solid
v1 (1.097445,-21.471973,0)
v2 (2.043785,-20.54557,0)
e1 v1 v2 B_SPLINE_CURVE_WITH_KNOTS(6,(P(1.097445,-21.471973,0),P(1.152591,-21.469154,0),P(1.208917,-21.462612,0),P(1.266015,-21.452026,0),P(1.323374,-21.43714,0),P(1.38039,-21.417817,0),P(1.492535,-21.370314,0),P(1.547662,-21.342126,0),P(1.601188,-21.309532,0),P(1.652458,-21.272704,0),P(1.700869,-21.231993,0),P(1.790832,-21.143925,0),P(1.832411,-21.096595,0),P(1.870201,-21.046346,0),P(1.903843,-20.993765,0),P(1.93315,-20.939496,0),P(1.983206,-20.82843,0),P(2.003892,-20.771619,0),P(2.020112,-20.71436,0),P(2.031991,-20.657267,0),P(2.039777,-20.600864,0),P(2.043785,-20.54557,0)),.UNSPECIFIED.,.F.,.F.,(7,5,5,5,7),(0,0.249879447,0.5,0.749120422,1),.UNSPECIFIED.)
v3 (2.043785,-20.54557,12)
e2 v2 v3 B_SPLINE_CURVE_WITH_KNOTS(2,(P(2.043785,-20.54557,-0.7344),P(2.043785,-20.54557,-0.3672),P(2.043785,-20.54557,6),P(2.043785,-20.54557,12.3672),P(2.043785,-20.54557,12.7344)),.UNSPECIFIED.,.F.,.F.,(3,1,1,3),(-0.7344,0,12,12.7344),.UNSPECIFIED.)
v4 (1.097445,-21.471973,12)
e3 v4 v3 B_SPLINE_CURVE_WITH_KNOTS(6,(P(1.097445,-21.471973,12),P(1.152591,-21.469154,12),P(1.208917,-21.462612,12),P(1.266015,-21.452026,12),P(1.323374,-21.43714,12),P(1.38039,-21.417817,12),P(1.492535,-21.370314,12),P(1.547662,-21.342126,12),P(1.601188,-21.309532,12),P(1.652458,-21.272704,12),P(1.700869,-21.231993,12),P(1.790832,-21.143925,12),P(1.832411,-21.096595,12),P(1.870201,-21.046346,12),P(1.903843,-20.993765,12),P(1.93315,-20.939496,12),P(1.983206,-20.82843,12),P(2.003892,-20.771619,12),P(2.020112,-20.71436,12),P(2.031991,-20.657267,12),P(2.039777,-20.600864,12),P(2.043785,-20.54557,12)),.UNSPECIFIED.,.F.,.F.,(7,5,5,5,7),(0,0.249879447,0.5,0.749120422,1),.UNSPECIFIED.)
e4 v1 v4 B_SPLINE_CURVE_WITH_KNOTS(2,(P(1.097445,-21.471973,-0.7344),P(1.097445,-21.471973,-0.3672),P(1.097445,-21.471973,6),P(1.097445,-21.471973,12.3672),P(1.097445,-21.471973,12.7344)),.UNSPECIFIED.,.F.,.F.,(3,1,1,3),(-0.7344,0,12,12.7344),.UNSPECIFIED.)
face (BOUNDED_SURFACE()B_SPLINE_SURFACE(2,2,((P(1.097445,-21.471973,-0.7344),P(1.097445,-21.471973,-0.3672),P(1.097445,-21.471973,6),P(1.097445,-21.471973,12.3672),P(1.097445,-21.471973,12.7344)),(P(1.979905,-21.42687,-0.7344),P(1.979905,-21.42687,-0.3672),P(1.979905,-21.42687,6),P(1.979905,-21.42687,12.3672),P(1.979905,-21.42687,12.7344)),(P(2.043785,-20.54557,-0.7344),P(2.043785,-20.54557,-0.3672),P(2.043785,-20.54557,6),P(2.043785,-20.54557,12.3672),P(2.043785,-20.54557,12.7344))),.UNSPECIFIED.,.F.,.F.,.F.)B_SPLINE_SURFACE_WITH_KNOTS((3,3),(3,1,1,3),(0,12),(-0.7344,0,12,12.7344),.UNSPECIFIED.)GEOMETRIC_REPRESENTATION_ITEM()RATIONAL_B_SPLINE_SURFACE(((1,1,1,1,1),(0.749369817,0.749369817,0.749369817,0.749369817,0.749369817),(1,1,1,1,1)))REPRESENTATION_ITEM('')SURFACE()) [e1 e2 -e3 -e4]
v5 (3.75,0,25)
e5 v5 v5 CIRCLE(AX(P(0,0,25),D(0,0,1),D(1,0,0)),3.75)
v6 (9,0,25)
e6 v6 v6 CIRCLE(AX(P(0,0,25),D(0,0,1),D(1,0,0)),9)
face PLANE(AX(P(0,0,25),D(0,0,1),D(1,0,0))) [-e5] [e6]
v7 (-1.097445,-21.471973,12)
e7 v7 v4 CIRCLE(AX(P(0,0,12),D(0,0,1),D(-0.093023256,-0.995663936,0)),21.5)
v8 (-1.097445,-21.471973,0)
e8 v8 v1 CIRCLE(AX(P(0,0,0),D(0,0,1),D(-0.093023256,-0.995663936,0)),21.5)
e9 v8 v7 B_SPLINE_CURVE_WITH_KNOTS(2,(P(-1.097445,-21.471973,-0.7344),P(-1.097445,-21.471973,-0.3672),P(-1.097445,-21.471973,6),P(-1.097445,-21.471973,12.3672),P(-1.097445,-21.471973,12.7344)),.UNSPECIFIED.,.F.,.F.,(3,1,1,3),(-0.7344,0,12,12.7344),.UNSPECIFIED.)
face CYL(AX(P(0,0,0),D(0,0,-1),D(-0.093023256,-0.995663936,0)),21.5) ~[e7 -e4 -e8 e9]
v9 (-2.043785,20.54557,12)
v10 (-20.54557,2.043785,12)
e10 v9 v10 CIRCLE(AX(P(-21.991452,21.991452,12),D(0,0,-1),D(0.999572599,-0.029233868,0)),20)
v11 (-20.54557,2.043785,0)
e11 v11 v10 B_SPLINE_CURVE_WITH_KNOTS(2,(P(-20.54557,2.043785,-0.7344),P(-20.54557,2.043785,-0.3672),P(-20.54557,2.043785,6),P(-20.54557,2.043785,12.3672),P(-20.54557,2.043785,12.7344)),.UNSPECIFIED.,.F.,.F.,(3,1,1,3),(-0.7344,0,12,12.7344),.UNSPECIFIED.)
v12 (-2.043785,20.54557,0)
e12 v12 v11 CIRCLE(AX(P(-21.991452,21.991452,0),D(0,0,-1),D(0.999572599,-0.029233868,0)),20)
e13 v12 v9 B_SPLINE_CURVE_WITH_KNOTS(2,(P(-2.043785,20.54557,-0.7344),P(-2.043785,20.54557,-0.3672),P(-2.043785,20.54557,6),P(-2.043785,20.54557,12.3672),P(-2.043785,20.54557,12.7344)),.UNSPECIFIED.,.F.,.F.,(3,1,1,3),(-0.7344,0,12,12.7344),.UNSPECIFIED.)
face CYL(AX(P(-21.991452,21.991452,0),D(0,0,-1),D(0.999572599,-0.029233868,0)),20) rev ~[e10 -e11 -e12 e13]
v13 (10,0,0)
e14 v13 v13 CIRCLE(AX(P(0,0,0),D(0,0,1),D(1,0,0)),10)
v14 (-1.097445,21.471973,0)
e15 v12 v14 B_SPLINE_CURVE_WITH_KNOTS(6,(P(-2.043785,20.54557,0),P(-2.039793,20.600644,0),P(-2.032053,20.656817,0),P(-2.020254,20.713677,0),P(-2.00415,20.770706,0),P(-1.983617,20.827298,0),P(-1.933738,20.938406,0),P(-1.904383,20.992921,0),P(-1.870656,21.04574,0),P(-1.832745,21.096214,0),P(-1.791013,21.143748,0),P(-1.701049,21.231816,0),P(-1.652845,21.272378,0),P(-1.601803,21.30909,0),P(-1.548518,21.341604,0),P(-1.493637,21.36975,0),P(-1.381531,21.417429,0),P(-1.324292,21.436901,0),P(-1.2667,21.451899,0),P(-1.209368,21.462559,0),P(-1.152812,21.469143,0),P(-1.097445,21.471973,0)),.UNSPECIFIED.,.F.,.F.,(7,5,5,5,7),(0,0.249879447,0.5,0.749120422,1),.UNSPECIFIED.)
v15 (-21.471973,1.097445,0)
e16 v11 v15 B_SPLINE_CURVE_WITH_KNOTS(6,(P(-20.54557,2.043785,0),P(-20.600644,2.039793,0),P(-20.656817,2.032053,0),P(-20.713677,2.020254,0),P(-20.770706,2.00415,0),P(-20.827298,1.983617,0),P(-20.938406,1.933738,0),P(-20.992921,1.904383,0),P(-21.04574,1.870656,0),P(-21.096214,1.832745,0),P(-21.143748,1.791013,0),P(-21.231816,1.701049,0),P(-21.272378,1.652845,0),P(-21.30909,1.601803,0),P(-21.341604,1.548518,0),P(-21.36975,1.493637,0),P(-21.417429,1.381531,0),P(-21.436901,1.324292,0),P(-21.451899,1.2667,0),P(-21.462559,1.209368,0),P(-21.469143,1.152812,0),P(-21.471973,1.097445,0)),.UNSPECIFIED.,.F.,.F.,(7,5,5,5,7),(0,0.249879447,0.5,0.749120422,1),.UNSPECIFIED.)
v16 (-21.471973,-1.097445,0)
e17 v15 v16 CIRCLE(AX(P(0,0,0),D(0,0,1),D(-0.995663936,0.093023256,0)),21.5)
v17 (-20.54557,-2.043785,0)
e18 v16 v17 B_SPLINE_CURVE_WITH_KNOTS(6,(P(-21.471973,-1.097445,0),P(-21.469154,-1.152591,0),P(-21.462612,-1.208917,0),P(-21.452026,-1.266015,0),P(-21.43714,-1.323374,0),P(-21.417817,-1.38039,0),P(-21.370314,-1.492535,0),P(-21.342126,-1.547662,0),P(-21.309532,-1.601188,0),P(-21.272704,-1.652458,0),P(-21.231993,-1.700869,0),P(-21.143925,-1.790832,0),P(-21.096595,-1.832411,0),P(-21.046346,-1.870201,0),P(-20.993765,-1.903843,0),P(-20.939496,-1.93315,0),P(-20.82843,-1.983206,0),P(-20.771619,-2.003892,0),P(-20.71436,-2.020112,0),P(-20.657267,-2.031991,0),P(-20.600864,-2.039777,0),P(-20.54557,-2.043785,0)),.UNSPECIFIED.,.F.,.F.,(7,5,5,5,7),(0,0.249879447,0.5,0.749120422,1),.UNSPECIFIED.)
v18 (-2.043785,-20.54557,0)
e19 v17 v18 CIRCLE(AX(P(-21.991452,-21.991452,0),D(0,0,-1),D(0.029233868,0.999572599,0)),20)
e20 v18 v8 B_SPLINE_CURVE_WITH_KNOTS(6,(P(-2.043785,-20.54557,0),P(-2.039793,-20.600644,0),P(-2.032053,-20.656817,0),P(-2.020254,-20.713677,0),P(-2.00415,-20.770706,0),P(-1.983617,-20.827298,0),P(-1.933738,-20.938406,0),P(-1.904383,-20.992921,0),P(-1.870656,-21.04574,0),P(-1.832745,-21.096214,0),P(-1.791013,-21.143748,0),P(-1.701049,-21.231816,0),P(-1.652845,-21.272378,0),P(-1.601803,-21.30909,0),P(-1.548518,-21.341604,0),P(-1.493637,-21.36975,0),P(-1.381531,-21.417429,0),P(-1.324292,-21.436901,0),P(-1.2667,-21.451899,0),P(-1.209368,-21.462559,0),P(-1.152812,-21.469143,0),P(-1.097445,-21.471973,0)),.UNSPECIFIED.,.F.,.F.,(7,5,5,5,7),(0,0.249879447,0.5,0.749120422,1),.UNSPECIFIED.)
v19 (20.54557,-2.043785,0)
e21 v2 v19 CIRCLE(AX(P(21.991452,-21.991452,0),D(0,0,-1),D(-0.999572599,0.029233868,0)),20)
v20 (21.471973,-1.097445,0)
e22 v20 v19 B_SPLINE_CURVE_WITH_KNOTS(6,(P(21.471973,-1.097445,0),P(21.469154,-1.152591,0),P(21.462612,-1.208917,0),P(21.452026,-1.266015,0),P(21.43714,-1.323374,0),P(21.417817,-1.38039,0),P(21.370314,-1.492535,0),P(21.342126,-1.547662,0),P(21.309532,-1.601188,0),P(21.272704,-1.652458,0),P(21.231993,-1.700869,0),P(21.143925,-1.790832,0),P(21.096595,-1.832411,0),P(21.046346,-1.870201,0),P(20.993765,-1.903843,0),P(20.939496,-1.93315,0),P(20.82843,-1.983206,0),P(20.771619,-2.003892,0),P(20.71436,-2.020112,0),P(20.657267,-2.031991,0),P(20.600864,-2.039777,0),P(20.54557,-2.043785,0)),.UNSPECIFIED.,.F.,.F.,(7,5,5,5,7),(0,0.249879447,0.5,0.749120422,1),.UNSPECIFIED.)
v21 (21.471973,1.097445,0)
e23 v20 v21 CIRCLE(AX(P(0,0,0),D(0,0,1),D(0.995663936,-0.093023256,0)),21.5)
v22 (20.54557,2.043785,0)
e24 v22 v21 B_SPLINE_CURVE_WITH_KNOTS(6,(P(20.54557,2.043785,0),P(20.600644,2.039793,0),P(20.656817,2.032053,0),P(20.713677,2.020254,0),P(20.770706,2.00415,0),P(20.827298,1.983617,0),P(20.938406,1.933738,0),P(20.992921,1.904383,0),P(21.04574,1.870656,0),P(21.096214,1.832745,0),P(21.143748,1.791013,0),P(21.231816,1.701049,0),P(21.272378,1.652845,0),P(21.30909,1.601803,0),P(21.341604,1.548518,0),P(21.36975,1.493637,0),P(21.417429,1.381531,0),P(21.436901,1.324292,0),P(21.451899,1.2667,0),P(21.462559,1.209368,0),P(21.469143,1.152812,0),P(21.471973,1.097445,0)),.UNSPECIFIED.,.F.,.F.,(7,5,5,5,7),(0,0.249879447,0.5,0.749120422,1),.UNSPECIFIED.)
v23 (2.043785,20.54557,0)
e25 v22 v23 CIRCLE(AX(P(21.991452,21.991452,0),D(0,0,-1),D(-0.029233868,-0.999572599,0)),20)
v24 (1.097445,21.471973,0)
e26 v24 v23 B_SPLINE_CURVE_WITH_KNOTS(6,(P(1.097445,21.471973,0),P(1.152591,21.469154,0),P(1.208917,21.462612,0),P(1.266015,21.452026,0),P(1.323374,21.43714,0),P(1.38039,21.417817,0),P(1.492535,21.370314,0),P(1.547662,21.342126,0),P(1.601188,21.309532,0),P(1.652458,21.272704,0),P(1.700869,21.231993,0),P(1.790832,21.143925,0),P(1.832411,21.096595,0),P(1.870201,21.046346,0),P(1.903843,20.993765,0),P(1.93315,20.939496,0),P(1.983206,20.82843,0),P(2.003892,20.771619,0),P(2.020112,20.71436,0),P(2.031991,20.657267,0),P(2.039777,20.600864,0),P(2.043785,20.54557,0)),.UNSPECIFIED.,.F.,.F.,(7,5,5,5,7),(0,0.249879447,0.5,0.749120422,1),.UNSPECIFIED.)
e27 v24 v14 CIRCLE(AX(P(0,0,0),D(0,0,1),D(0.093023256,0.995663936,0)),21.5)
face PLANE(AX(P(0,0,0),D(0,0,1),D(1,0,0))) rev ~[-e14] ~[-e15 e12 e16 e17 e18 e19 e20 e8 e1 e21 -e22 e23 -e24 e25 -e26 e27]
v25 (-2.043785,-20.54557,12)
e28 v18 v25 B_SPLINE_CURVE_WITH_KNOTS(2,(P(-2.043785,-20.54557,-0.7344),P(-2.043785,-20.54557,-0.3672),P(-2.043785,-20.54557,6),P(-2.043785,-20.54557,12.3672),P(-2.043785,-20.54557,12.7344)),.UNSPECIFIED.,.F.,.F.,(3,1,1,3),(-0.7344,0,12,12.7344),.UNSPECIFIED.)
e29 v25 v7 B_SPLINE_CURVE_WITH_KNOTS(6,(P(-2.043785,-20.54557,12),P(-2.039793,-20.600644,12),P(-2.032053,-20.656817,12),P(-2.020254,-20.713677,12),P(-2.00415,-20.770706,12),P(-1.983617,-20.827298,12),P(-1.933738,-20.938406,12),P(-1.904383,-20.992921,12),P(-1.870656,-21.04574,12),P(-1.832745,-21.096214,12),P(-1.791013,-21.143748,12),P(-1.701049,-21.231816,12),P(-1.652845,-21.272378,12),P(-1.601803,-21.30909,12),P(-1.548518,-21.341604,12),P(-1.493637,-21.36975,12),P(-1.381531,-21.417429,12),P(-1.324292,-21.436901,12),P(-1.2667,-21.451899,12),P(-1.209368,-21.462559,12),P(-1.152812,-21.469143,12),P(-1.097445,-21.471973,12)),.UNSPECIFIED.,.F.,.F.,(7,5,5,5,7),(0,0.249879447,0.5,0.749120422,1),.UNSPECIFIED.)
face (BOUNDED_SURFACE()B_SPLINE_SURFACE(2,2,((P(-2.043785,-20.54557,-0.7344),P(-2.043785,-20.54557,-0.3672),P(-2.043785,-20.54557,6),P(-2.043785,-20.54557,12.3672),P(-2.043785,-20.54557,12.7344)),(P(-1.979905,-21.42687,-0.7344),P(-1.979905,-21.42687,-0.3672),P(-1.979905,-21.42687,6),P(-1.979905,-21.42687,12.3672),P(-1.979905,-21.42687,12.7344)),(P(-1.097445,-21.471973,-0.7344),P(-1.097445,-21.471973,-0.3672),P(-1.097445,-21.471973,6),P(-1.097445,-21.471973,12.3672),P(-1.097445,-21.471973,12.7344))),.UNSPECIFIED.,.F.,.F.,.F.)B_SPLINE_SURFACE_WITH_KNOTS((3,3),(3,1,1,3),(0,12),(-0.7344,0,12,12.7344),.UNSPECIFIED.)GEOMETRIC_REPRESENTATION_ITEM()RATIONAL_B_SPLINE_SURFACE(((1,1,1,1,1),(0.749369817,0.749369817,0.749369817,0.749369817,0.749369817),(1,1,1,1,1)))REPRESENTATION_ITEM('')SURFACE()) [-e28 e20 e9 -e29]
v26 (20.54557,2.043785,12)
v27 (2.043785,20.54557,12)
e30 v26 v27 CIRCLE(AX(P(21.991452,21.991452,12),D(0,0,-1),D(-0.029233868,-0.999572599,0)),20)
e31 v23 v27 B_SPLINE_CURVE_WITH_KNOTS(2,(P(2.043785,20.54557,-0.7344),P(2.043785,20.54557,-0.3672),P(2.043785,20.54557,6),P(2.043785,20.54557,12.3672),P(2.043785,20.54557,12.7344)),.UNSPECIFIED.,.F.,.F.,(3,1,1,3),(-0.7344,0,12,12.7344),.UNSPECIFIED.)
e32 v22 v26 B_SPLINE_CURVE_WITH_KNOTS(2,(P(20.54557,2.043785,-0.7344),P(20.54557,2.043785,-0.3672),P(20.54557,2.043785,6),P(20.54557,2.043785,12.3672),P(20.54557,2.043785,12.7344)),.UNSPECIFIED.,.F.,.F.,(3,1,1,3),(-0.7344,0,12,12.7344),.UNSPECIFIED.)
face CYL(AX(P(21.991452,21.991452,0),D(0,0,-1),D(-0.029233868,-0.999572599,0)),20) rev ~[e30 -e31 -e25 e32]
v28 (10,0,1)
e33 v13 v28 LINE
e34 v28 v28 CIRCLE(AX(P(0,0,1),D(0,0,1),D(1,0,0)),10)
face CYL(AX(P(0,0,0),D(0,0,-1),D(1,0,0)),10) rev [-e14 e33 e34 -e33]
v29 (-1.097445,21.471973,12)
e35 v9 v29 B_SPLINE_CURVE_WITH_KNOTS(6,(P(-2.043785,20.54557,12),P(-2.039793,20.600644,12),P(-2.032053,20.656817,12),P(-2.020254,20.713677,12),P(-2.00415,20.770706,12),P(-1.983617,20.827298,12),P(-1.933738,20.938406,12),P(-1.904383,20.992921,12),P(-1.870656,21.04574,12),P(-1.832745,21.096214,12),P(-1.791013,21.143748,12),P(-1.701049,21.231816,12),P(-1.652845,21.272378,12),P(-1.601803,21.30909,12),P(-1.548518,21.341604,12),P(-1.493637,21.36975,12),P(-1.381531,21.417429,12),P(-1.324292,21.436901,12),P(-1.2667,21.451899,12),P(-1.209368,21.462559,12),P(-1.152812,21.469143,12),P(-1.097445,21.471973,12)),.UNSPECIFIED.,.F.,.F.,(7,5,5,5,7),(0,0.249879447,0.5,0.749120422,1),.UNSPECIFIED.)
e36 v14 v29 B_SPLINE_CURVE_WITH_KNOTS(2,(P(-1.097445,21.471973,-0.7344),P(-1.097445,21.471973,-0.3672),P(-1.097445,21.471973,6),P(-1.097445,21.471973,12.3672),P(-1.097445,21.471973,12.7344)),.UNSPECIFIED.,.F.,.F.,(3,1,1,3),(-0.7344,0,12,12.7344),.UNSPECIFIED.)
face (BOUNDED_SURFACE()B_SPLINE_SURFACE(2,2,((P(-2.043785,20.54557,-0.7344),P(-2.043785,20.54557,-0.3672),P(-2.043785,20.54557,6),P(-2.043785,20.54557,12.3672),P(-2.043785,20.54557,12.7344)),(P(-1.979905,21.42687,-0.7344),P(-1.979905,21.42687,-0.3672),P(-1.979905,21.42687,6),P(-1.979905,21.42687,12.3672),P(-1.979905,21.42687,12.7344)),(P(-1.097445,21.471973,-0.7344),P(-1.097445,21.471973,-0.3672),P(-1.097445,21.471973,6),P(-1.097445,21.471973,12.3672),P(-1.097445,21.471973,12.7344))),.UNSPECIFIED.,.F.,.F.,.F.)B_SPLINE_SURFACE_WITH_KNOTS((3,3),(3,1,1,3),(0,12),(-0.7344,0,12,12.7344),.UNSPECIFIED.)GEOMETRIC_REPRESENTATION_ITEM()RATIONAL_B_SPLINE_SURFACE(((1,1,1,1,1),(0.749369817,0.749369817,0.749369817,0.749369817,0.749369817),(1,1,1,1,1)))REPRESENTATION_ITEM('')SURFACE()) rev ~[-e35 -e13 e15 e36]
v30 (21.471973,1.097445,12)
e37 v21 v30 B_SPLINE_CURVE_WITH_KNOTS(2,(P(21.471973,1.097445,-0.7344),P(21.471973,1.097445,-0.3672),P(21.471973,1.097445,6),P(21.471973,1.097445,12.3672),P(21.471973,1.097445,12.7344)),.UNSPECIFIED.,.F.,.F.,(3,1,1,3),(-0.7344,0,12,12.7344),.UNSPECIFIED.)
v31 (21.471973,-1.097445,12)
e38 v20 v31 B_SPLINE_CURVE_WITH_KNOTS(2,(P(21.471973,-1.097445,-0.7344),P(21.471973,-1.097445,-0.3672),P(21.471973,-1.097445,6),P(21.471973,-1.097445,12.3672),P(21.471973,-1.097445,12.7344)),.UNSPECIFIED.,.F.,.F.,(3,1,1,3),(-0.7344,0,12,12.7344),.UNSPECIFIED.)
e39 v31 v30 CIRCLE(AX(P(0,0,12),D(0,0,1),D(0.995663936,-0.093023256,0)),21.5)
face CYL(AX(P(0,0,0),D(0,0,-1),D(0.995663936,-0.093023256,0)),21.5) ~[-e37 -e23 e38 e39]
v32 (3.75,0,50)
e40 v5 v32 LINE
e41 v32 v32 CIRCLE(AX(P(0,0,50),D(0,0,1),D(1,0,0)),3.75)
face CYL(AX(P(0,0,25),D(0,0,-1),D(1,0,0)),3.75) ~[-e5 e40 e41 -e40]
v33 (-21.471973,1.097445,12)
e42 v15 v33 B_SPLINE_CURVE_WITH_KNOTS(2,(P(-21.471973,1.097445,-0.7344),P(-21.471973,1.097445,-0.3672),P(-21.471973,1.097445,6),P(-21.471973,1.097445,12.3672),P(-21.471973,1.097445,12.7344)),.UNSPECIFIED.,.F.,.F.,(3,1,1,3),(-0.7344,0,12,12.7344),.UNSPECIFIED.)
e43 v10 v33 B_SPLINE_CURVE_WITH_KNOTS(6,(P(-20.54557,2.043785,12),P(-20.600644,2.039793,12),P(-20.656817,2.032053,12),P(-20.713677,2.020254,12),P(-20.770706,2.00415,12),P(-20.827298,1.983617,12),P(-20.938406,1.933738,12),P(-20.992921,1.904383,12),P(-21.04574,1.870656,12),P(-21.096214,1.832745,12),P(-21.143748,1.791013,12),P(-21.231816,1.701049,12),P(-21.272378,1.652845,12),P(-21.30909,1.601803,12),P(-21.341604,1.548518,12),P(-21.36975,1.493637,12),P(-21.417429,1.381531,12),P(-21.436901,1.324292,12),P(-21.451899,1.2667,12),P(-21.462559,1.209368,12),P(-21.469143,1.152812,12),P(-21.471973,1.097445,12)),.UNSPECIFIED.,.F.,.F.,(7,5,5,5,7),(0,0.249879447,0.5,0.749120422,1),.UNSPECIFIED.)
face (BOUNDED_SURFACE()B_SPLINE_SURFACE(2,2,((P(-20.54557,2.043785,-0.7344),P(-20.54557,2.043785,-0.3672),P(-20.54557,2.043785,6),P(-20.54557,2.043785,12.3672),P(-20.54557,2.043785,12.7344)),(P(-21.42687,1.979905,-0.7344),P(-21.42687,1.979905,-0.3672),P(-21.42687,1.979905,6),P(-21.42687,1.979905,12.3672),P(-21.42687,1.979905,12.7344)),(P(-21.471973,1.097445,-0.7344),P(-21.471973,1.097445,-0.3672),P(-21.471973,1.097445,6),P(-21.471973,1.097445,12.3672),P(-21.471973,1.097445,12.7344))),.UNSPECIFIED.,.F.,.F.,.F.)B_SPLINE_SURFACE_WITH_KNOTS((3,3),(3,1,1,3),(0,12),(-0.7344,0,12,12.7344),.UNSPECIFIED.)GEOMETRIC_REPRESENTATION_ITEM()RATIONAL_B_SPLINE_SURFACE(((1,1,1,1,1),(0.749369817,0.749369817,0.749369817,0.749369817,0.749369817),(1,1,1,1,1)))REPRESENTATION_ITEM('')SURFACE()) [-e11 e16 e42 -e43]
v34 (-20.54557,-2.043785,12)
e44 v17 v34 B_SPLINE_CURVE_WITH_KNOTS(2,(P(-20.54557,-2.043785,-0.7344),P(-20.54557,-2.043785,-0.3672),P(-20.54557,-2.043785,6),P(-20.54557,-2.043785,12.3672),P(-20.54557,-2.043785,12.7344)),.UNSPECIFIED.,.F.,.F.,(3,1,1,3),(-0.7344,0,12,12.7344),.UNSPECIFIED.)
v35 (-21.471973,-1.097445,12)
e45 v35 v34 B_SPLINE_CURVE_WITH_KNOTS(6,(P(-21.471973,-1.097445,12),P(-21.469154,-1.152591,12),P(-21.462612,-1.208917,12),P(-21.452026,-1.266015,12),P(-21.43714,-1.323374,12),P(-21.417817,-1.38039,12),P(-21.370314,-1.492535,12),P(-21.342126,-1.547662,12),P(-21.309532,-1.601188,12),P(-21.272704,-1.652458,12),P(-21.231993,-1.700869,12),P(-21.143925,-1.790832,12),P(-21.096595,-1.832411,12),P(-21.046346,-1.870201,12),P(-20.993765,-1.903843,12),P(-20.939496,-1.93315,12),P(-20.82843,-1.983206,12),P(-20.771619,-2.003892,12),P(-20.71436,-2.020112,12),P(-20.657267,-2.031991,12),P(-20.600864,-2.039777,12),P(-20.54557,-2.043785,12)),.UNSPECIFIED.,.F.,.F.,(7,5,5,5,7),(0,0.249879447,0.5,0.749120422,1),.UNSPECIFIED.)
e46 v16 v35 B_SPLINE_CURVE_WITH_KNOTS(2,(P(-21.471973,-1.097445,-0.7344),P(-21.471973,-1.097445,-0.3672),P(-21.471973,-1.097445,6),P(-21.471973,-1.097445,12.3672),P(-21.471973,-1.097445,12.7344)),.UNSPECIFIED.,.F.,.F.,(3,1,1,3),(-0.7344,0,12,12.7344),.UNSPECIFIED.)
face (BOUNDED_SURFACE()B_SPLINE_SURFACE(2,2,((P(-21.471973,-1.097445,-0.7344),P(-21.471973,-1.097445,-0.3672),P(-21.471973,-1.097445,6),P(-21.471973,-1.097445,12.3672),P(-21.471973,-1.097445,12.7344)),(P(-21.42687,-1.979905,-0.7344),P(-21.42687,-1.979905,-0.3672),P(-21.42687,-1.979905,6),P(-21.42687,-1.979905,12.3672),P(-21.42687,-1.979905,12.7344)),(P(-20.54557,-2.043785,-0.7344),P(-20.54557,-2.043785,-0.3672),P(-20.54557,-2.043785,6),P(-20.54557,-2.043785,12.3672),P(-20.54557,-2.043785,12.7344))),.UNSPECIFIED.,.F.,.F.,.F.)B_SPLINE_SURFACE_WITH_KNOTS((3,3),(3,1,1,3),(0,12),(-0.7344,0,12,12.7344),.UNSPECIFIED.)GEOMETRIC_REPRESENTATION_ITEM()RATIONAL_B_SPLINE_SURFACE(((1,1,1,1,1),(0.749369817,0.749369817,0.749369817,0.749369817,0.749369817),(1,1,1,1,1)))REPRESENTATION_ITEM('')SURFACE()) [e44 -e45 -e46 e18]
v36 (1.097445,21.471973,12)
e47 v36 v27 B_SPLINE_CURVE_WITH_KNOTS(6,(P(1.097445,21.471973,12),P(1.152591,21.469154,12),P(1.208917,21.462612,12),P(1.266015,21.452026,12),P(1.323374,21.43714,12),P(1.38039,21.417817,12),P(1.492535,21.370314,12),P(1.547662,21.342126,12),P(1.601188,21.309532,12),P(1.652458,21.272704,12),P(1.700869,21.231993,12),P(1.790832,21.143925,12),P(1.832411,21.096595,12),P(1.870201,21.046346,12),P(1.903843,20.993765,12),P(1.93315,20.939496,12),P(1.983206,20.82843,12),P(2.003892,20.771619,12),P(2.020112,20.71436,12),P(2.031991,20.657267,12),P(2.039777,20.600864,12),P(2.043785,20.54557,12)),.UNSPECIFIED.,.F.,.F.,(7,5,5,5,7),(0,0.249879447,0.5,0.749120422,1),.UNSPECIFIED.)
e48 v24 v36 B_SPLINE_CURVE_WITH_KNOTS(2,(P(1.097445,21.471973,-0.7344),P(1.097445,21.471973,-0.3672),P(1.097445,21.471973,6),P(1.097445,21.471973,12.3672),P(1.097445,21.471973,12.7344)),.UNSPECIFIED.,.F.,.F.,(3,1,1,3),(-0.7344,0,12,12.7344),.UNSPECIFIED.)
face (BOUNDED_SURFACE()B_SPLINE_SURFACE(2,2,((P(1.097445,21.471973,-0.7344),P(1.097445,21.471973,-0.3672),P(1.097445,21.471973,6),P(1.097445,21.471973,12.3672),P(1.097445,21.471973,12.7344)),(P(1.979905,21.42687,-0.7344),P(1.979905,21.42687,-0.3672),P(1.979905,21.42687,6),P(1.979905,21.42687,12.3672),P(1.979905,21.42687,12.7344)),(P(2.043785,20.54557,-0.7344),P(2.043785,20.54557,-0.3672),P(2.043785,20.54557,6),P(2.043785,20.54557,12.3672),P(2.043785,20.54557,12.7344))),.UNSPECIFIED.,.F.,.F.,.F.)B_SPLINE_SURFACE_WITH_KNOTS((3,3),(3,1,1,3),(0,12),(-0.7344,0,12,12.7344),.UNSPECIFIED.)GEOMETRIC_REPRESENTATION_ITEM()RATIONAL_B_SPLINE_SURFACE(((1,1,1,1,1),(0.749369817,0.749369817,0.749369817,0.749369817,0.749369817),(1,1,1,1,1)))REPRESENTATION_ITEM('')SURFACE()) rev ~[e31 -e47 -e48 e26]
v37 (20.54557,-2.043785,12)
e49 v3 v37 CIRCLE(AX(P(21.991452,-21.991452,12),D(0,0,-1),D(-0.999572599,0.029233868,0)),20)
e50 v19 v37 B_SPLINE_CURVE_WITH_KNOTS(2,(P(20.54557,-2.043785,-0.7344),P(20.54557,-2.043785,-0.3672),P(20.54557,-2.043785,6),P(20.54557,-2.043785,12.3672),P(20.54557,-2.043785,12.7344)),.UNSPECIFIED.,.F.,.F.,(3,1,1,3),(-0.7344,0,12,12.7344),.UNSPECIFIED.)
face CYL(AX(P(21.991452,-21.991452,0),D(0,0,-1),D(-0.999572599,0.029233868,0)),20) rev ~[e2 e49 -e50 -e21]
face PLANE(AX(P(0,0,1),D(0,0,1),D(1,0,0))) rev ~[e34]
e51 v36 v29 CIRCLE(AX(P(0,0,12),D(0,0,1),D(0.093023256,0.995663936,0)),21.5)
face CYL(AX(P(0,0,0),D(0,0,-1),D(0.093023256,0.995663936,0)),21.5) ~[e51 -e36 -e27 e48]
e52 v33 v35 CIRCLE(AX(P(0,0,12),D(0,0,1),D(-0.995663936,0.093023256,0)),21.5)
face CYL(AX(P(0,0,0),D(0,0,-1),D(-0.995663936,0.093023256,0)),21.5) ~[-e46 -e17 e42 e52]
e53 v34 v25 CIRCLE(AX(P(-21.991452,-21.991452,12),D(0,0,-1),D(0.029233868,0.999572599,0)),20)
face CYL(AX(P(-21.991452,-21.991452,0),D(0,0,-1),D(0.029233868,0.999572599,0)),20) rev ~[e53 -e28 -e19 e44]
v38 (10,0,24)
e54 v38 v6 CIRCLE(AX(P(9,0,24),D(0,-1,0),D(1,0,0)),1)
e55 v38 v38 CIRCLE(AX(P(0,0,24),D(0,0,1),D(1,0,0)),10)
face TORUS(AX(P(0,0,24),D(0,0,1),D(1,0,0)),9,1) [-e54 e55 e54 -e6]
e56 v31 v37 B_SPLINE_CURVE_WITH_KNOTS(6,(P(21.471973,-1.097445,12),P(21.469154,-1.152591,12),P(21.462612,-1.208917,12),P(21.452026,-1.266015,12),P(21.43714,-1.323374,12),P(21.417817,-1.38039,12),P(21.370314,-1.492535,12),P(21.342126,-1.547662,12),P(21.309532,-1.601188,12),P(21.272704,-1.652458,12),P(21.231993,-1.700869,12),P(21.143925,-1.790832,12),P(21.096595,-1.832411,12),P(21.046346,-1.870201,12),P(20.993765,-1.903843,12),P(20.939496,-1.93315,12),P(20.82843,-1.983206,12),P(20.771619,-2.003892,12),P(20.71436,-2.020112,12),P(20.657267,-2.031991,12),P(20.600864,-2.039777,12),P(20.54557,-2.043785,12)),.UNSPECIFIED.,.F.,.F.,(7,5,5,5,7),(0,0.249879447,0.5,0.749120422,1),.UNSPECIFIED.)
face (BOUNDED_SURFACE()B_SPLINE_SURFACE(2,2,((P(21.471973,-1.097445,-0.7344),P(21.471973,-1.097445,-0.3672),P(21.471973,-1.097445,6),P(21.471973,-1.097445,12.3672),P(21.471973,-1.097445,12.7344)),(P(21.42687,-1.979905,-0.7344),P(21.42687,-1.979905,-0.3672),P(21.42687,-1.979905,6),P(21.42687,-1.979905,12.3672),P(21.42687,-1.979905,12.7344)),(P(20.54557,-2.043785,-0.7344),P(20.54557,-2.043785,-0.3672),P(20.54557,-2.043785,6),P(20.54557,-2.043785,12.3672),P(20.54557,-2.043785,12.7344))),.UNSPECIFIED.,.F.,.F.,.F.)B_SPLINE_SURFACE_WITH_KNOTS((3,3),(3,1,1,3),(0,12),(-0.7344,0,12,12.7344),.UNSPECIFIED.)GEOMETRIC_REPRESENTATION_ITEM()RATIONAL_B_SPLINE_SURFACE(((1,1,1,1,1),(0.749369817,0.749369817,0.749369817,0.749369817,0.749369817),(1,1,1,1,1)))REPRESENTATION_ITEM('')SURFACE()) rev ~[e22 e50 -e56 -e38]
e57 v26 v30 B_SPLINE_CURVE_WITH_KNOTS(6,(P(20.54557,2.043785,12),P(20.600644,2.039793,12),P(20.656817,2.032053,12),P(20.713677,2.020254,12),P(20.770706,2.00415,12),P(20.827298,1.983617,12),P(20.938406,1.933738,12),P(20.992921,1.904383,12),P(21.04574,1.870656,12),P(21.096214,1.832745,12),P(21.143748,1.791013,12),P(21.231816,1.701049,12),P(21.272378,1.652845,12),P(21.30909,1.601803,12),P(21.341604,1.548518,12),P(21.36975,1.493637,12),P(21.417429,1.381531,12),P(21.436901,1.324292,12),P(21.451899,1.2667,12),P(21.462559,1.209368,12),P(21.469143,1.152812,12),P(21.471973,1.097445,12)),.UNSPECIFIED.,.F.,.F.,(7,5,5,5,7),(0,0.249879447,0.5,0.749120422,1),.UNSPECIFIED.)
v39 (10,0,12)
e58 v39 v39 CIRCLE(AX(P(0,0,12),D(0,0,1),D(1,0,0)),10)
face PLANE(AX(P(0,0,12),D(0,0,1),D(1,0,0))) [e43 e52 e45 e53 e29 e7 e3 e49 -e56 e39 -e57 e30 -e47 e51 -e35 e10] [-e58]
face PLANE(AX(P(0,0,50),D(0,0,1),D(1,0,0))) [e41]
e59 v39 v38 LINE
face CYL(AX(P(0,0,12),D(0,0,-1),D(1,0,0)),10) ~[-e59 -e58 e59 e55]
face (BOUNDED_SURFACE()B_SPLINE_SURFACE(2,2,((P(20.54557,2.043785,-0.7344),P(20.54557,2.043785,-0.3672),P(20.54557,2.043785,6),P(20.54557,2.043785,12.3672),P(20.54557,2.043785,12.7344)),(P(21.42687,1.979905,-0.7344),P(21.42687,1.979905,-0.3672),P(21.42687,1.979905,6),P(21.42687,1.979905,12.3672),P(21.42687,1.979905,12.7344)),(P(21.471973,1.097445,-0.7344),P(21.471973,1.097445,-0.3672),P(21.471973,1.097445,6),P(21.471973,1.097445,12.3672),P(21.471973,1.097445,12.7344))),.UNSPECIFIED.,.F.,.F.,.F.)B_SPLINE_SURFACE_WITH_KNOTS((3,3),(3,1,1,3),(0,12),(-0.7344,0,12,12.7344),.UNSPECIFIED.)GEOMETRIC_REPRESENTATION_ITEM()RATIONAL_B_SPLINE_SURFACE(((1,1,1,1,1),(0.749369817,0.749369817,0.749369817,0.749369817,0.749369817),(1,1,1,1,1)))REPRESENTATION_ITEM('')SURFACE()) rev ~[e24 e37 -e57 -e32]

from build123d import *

# Parameters (mm, degrees)
F0_R     = 10
F1_DEPTH = 12
F2_R     = 10
F3_DEPTH = 13
F4_R     = 3.75
F5_DEPTH = 25
F6_R     = 1
F7_R     = 1
F8_DEPTH = 1


with BuildPart() as f1:
    # F0 (on Top) → F1 (new body)
    with BuildSketch(Plane.XY):
        with BuildLine():
            ThreePointArc((-2, 21.4067746286), (-7.8493163593, 7.8493163593), (-21.4067746286, 2))
            ThreePointArc((-21.4067746286, 2), (-21.5, 0), (-21.4067746286, -2))
            ThreePointArc((-21.4067746286, -2), (-7.8493163593, -7.8493163593), (-2, -21.4067746286))
            ThreePointArc((-2, -21.4067746286), (0, -21.5), (2, -21.4067746286))
            ThreePointArc((2, -21.4067746286), (7.8493163593, -7.8493163593), (21.4067746286, -2))
            ThreePointArc((21.4067746286, -2), (21.5, 0), (21.4067746286, 2))
            ThreePointArc((21.4067746286, 2), (7.8493163593, 7.8493163593), (2, 21.4067746286))
            ThreePointArc((2, 21.4067746286), (0, 21.5), (-2, 21.4067746286))
        make_face()
        Circle(F0_R, mode=Mode.SUBTRACT)
        Circle(F0_R)
    extrude(amount=F1_DEPTH)

    # F2 (on face) → F3 (join)
    with BuildSketch(Plane.XY.offset(12)):
        Circle(F2_R)
    extrude(amount=F3_DEPTH)

    # F4 (on face) → F5 (join)
    with BuildSketch(Plane.XY.offset(25)):
        Circle(F4_R)
    extrude(amount=F5_DEPTH)

    # F6
    f6_edges = [f1.edges().sort_by_distance(p)[0] for p in [
        (-10, 0, 25),
    ]]
    fillet(f6_edges, radius=F6_R)

    # F7
    f7_edges = [f1.edges().sort_by_distance(p)[0] for p in [
        (-2, -21.406775, 6),
        (2, -21.406775, 6),
        (-21.406775, -2, 6),
        (-21.406775, 2, 6),
        (-2, 21.406775, 6),
        (2, 21.406775, 6),
        (21.406775, 2, 6),
        (21.406775, -2, 6),
    ]]
    fillet(f7_edges, radius=F7_R)

    # F0 (on Top) → F8 (cut)
    with BuildSketch(Plane.XY):
        Circle(F0_R)
    extrude(amount=F8_DEPTH, mode=Mode.SUBTRACT)


solid = f1.part
